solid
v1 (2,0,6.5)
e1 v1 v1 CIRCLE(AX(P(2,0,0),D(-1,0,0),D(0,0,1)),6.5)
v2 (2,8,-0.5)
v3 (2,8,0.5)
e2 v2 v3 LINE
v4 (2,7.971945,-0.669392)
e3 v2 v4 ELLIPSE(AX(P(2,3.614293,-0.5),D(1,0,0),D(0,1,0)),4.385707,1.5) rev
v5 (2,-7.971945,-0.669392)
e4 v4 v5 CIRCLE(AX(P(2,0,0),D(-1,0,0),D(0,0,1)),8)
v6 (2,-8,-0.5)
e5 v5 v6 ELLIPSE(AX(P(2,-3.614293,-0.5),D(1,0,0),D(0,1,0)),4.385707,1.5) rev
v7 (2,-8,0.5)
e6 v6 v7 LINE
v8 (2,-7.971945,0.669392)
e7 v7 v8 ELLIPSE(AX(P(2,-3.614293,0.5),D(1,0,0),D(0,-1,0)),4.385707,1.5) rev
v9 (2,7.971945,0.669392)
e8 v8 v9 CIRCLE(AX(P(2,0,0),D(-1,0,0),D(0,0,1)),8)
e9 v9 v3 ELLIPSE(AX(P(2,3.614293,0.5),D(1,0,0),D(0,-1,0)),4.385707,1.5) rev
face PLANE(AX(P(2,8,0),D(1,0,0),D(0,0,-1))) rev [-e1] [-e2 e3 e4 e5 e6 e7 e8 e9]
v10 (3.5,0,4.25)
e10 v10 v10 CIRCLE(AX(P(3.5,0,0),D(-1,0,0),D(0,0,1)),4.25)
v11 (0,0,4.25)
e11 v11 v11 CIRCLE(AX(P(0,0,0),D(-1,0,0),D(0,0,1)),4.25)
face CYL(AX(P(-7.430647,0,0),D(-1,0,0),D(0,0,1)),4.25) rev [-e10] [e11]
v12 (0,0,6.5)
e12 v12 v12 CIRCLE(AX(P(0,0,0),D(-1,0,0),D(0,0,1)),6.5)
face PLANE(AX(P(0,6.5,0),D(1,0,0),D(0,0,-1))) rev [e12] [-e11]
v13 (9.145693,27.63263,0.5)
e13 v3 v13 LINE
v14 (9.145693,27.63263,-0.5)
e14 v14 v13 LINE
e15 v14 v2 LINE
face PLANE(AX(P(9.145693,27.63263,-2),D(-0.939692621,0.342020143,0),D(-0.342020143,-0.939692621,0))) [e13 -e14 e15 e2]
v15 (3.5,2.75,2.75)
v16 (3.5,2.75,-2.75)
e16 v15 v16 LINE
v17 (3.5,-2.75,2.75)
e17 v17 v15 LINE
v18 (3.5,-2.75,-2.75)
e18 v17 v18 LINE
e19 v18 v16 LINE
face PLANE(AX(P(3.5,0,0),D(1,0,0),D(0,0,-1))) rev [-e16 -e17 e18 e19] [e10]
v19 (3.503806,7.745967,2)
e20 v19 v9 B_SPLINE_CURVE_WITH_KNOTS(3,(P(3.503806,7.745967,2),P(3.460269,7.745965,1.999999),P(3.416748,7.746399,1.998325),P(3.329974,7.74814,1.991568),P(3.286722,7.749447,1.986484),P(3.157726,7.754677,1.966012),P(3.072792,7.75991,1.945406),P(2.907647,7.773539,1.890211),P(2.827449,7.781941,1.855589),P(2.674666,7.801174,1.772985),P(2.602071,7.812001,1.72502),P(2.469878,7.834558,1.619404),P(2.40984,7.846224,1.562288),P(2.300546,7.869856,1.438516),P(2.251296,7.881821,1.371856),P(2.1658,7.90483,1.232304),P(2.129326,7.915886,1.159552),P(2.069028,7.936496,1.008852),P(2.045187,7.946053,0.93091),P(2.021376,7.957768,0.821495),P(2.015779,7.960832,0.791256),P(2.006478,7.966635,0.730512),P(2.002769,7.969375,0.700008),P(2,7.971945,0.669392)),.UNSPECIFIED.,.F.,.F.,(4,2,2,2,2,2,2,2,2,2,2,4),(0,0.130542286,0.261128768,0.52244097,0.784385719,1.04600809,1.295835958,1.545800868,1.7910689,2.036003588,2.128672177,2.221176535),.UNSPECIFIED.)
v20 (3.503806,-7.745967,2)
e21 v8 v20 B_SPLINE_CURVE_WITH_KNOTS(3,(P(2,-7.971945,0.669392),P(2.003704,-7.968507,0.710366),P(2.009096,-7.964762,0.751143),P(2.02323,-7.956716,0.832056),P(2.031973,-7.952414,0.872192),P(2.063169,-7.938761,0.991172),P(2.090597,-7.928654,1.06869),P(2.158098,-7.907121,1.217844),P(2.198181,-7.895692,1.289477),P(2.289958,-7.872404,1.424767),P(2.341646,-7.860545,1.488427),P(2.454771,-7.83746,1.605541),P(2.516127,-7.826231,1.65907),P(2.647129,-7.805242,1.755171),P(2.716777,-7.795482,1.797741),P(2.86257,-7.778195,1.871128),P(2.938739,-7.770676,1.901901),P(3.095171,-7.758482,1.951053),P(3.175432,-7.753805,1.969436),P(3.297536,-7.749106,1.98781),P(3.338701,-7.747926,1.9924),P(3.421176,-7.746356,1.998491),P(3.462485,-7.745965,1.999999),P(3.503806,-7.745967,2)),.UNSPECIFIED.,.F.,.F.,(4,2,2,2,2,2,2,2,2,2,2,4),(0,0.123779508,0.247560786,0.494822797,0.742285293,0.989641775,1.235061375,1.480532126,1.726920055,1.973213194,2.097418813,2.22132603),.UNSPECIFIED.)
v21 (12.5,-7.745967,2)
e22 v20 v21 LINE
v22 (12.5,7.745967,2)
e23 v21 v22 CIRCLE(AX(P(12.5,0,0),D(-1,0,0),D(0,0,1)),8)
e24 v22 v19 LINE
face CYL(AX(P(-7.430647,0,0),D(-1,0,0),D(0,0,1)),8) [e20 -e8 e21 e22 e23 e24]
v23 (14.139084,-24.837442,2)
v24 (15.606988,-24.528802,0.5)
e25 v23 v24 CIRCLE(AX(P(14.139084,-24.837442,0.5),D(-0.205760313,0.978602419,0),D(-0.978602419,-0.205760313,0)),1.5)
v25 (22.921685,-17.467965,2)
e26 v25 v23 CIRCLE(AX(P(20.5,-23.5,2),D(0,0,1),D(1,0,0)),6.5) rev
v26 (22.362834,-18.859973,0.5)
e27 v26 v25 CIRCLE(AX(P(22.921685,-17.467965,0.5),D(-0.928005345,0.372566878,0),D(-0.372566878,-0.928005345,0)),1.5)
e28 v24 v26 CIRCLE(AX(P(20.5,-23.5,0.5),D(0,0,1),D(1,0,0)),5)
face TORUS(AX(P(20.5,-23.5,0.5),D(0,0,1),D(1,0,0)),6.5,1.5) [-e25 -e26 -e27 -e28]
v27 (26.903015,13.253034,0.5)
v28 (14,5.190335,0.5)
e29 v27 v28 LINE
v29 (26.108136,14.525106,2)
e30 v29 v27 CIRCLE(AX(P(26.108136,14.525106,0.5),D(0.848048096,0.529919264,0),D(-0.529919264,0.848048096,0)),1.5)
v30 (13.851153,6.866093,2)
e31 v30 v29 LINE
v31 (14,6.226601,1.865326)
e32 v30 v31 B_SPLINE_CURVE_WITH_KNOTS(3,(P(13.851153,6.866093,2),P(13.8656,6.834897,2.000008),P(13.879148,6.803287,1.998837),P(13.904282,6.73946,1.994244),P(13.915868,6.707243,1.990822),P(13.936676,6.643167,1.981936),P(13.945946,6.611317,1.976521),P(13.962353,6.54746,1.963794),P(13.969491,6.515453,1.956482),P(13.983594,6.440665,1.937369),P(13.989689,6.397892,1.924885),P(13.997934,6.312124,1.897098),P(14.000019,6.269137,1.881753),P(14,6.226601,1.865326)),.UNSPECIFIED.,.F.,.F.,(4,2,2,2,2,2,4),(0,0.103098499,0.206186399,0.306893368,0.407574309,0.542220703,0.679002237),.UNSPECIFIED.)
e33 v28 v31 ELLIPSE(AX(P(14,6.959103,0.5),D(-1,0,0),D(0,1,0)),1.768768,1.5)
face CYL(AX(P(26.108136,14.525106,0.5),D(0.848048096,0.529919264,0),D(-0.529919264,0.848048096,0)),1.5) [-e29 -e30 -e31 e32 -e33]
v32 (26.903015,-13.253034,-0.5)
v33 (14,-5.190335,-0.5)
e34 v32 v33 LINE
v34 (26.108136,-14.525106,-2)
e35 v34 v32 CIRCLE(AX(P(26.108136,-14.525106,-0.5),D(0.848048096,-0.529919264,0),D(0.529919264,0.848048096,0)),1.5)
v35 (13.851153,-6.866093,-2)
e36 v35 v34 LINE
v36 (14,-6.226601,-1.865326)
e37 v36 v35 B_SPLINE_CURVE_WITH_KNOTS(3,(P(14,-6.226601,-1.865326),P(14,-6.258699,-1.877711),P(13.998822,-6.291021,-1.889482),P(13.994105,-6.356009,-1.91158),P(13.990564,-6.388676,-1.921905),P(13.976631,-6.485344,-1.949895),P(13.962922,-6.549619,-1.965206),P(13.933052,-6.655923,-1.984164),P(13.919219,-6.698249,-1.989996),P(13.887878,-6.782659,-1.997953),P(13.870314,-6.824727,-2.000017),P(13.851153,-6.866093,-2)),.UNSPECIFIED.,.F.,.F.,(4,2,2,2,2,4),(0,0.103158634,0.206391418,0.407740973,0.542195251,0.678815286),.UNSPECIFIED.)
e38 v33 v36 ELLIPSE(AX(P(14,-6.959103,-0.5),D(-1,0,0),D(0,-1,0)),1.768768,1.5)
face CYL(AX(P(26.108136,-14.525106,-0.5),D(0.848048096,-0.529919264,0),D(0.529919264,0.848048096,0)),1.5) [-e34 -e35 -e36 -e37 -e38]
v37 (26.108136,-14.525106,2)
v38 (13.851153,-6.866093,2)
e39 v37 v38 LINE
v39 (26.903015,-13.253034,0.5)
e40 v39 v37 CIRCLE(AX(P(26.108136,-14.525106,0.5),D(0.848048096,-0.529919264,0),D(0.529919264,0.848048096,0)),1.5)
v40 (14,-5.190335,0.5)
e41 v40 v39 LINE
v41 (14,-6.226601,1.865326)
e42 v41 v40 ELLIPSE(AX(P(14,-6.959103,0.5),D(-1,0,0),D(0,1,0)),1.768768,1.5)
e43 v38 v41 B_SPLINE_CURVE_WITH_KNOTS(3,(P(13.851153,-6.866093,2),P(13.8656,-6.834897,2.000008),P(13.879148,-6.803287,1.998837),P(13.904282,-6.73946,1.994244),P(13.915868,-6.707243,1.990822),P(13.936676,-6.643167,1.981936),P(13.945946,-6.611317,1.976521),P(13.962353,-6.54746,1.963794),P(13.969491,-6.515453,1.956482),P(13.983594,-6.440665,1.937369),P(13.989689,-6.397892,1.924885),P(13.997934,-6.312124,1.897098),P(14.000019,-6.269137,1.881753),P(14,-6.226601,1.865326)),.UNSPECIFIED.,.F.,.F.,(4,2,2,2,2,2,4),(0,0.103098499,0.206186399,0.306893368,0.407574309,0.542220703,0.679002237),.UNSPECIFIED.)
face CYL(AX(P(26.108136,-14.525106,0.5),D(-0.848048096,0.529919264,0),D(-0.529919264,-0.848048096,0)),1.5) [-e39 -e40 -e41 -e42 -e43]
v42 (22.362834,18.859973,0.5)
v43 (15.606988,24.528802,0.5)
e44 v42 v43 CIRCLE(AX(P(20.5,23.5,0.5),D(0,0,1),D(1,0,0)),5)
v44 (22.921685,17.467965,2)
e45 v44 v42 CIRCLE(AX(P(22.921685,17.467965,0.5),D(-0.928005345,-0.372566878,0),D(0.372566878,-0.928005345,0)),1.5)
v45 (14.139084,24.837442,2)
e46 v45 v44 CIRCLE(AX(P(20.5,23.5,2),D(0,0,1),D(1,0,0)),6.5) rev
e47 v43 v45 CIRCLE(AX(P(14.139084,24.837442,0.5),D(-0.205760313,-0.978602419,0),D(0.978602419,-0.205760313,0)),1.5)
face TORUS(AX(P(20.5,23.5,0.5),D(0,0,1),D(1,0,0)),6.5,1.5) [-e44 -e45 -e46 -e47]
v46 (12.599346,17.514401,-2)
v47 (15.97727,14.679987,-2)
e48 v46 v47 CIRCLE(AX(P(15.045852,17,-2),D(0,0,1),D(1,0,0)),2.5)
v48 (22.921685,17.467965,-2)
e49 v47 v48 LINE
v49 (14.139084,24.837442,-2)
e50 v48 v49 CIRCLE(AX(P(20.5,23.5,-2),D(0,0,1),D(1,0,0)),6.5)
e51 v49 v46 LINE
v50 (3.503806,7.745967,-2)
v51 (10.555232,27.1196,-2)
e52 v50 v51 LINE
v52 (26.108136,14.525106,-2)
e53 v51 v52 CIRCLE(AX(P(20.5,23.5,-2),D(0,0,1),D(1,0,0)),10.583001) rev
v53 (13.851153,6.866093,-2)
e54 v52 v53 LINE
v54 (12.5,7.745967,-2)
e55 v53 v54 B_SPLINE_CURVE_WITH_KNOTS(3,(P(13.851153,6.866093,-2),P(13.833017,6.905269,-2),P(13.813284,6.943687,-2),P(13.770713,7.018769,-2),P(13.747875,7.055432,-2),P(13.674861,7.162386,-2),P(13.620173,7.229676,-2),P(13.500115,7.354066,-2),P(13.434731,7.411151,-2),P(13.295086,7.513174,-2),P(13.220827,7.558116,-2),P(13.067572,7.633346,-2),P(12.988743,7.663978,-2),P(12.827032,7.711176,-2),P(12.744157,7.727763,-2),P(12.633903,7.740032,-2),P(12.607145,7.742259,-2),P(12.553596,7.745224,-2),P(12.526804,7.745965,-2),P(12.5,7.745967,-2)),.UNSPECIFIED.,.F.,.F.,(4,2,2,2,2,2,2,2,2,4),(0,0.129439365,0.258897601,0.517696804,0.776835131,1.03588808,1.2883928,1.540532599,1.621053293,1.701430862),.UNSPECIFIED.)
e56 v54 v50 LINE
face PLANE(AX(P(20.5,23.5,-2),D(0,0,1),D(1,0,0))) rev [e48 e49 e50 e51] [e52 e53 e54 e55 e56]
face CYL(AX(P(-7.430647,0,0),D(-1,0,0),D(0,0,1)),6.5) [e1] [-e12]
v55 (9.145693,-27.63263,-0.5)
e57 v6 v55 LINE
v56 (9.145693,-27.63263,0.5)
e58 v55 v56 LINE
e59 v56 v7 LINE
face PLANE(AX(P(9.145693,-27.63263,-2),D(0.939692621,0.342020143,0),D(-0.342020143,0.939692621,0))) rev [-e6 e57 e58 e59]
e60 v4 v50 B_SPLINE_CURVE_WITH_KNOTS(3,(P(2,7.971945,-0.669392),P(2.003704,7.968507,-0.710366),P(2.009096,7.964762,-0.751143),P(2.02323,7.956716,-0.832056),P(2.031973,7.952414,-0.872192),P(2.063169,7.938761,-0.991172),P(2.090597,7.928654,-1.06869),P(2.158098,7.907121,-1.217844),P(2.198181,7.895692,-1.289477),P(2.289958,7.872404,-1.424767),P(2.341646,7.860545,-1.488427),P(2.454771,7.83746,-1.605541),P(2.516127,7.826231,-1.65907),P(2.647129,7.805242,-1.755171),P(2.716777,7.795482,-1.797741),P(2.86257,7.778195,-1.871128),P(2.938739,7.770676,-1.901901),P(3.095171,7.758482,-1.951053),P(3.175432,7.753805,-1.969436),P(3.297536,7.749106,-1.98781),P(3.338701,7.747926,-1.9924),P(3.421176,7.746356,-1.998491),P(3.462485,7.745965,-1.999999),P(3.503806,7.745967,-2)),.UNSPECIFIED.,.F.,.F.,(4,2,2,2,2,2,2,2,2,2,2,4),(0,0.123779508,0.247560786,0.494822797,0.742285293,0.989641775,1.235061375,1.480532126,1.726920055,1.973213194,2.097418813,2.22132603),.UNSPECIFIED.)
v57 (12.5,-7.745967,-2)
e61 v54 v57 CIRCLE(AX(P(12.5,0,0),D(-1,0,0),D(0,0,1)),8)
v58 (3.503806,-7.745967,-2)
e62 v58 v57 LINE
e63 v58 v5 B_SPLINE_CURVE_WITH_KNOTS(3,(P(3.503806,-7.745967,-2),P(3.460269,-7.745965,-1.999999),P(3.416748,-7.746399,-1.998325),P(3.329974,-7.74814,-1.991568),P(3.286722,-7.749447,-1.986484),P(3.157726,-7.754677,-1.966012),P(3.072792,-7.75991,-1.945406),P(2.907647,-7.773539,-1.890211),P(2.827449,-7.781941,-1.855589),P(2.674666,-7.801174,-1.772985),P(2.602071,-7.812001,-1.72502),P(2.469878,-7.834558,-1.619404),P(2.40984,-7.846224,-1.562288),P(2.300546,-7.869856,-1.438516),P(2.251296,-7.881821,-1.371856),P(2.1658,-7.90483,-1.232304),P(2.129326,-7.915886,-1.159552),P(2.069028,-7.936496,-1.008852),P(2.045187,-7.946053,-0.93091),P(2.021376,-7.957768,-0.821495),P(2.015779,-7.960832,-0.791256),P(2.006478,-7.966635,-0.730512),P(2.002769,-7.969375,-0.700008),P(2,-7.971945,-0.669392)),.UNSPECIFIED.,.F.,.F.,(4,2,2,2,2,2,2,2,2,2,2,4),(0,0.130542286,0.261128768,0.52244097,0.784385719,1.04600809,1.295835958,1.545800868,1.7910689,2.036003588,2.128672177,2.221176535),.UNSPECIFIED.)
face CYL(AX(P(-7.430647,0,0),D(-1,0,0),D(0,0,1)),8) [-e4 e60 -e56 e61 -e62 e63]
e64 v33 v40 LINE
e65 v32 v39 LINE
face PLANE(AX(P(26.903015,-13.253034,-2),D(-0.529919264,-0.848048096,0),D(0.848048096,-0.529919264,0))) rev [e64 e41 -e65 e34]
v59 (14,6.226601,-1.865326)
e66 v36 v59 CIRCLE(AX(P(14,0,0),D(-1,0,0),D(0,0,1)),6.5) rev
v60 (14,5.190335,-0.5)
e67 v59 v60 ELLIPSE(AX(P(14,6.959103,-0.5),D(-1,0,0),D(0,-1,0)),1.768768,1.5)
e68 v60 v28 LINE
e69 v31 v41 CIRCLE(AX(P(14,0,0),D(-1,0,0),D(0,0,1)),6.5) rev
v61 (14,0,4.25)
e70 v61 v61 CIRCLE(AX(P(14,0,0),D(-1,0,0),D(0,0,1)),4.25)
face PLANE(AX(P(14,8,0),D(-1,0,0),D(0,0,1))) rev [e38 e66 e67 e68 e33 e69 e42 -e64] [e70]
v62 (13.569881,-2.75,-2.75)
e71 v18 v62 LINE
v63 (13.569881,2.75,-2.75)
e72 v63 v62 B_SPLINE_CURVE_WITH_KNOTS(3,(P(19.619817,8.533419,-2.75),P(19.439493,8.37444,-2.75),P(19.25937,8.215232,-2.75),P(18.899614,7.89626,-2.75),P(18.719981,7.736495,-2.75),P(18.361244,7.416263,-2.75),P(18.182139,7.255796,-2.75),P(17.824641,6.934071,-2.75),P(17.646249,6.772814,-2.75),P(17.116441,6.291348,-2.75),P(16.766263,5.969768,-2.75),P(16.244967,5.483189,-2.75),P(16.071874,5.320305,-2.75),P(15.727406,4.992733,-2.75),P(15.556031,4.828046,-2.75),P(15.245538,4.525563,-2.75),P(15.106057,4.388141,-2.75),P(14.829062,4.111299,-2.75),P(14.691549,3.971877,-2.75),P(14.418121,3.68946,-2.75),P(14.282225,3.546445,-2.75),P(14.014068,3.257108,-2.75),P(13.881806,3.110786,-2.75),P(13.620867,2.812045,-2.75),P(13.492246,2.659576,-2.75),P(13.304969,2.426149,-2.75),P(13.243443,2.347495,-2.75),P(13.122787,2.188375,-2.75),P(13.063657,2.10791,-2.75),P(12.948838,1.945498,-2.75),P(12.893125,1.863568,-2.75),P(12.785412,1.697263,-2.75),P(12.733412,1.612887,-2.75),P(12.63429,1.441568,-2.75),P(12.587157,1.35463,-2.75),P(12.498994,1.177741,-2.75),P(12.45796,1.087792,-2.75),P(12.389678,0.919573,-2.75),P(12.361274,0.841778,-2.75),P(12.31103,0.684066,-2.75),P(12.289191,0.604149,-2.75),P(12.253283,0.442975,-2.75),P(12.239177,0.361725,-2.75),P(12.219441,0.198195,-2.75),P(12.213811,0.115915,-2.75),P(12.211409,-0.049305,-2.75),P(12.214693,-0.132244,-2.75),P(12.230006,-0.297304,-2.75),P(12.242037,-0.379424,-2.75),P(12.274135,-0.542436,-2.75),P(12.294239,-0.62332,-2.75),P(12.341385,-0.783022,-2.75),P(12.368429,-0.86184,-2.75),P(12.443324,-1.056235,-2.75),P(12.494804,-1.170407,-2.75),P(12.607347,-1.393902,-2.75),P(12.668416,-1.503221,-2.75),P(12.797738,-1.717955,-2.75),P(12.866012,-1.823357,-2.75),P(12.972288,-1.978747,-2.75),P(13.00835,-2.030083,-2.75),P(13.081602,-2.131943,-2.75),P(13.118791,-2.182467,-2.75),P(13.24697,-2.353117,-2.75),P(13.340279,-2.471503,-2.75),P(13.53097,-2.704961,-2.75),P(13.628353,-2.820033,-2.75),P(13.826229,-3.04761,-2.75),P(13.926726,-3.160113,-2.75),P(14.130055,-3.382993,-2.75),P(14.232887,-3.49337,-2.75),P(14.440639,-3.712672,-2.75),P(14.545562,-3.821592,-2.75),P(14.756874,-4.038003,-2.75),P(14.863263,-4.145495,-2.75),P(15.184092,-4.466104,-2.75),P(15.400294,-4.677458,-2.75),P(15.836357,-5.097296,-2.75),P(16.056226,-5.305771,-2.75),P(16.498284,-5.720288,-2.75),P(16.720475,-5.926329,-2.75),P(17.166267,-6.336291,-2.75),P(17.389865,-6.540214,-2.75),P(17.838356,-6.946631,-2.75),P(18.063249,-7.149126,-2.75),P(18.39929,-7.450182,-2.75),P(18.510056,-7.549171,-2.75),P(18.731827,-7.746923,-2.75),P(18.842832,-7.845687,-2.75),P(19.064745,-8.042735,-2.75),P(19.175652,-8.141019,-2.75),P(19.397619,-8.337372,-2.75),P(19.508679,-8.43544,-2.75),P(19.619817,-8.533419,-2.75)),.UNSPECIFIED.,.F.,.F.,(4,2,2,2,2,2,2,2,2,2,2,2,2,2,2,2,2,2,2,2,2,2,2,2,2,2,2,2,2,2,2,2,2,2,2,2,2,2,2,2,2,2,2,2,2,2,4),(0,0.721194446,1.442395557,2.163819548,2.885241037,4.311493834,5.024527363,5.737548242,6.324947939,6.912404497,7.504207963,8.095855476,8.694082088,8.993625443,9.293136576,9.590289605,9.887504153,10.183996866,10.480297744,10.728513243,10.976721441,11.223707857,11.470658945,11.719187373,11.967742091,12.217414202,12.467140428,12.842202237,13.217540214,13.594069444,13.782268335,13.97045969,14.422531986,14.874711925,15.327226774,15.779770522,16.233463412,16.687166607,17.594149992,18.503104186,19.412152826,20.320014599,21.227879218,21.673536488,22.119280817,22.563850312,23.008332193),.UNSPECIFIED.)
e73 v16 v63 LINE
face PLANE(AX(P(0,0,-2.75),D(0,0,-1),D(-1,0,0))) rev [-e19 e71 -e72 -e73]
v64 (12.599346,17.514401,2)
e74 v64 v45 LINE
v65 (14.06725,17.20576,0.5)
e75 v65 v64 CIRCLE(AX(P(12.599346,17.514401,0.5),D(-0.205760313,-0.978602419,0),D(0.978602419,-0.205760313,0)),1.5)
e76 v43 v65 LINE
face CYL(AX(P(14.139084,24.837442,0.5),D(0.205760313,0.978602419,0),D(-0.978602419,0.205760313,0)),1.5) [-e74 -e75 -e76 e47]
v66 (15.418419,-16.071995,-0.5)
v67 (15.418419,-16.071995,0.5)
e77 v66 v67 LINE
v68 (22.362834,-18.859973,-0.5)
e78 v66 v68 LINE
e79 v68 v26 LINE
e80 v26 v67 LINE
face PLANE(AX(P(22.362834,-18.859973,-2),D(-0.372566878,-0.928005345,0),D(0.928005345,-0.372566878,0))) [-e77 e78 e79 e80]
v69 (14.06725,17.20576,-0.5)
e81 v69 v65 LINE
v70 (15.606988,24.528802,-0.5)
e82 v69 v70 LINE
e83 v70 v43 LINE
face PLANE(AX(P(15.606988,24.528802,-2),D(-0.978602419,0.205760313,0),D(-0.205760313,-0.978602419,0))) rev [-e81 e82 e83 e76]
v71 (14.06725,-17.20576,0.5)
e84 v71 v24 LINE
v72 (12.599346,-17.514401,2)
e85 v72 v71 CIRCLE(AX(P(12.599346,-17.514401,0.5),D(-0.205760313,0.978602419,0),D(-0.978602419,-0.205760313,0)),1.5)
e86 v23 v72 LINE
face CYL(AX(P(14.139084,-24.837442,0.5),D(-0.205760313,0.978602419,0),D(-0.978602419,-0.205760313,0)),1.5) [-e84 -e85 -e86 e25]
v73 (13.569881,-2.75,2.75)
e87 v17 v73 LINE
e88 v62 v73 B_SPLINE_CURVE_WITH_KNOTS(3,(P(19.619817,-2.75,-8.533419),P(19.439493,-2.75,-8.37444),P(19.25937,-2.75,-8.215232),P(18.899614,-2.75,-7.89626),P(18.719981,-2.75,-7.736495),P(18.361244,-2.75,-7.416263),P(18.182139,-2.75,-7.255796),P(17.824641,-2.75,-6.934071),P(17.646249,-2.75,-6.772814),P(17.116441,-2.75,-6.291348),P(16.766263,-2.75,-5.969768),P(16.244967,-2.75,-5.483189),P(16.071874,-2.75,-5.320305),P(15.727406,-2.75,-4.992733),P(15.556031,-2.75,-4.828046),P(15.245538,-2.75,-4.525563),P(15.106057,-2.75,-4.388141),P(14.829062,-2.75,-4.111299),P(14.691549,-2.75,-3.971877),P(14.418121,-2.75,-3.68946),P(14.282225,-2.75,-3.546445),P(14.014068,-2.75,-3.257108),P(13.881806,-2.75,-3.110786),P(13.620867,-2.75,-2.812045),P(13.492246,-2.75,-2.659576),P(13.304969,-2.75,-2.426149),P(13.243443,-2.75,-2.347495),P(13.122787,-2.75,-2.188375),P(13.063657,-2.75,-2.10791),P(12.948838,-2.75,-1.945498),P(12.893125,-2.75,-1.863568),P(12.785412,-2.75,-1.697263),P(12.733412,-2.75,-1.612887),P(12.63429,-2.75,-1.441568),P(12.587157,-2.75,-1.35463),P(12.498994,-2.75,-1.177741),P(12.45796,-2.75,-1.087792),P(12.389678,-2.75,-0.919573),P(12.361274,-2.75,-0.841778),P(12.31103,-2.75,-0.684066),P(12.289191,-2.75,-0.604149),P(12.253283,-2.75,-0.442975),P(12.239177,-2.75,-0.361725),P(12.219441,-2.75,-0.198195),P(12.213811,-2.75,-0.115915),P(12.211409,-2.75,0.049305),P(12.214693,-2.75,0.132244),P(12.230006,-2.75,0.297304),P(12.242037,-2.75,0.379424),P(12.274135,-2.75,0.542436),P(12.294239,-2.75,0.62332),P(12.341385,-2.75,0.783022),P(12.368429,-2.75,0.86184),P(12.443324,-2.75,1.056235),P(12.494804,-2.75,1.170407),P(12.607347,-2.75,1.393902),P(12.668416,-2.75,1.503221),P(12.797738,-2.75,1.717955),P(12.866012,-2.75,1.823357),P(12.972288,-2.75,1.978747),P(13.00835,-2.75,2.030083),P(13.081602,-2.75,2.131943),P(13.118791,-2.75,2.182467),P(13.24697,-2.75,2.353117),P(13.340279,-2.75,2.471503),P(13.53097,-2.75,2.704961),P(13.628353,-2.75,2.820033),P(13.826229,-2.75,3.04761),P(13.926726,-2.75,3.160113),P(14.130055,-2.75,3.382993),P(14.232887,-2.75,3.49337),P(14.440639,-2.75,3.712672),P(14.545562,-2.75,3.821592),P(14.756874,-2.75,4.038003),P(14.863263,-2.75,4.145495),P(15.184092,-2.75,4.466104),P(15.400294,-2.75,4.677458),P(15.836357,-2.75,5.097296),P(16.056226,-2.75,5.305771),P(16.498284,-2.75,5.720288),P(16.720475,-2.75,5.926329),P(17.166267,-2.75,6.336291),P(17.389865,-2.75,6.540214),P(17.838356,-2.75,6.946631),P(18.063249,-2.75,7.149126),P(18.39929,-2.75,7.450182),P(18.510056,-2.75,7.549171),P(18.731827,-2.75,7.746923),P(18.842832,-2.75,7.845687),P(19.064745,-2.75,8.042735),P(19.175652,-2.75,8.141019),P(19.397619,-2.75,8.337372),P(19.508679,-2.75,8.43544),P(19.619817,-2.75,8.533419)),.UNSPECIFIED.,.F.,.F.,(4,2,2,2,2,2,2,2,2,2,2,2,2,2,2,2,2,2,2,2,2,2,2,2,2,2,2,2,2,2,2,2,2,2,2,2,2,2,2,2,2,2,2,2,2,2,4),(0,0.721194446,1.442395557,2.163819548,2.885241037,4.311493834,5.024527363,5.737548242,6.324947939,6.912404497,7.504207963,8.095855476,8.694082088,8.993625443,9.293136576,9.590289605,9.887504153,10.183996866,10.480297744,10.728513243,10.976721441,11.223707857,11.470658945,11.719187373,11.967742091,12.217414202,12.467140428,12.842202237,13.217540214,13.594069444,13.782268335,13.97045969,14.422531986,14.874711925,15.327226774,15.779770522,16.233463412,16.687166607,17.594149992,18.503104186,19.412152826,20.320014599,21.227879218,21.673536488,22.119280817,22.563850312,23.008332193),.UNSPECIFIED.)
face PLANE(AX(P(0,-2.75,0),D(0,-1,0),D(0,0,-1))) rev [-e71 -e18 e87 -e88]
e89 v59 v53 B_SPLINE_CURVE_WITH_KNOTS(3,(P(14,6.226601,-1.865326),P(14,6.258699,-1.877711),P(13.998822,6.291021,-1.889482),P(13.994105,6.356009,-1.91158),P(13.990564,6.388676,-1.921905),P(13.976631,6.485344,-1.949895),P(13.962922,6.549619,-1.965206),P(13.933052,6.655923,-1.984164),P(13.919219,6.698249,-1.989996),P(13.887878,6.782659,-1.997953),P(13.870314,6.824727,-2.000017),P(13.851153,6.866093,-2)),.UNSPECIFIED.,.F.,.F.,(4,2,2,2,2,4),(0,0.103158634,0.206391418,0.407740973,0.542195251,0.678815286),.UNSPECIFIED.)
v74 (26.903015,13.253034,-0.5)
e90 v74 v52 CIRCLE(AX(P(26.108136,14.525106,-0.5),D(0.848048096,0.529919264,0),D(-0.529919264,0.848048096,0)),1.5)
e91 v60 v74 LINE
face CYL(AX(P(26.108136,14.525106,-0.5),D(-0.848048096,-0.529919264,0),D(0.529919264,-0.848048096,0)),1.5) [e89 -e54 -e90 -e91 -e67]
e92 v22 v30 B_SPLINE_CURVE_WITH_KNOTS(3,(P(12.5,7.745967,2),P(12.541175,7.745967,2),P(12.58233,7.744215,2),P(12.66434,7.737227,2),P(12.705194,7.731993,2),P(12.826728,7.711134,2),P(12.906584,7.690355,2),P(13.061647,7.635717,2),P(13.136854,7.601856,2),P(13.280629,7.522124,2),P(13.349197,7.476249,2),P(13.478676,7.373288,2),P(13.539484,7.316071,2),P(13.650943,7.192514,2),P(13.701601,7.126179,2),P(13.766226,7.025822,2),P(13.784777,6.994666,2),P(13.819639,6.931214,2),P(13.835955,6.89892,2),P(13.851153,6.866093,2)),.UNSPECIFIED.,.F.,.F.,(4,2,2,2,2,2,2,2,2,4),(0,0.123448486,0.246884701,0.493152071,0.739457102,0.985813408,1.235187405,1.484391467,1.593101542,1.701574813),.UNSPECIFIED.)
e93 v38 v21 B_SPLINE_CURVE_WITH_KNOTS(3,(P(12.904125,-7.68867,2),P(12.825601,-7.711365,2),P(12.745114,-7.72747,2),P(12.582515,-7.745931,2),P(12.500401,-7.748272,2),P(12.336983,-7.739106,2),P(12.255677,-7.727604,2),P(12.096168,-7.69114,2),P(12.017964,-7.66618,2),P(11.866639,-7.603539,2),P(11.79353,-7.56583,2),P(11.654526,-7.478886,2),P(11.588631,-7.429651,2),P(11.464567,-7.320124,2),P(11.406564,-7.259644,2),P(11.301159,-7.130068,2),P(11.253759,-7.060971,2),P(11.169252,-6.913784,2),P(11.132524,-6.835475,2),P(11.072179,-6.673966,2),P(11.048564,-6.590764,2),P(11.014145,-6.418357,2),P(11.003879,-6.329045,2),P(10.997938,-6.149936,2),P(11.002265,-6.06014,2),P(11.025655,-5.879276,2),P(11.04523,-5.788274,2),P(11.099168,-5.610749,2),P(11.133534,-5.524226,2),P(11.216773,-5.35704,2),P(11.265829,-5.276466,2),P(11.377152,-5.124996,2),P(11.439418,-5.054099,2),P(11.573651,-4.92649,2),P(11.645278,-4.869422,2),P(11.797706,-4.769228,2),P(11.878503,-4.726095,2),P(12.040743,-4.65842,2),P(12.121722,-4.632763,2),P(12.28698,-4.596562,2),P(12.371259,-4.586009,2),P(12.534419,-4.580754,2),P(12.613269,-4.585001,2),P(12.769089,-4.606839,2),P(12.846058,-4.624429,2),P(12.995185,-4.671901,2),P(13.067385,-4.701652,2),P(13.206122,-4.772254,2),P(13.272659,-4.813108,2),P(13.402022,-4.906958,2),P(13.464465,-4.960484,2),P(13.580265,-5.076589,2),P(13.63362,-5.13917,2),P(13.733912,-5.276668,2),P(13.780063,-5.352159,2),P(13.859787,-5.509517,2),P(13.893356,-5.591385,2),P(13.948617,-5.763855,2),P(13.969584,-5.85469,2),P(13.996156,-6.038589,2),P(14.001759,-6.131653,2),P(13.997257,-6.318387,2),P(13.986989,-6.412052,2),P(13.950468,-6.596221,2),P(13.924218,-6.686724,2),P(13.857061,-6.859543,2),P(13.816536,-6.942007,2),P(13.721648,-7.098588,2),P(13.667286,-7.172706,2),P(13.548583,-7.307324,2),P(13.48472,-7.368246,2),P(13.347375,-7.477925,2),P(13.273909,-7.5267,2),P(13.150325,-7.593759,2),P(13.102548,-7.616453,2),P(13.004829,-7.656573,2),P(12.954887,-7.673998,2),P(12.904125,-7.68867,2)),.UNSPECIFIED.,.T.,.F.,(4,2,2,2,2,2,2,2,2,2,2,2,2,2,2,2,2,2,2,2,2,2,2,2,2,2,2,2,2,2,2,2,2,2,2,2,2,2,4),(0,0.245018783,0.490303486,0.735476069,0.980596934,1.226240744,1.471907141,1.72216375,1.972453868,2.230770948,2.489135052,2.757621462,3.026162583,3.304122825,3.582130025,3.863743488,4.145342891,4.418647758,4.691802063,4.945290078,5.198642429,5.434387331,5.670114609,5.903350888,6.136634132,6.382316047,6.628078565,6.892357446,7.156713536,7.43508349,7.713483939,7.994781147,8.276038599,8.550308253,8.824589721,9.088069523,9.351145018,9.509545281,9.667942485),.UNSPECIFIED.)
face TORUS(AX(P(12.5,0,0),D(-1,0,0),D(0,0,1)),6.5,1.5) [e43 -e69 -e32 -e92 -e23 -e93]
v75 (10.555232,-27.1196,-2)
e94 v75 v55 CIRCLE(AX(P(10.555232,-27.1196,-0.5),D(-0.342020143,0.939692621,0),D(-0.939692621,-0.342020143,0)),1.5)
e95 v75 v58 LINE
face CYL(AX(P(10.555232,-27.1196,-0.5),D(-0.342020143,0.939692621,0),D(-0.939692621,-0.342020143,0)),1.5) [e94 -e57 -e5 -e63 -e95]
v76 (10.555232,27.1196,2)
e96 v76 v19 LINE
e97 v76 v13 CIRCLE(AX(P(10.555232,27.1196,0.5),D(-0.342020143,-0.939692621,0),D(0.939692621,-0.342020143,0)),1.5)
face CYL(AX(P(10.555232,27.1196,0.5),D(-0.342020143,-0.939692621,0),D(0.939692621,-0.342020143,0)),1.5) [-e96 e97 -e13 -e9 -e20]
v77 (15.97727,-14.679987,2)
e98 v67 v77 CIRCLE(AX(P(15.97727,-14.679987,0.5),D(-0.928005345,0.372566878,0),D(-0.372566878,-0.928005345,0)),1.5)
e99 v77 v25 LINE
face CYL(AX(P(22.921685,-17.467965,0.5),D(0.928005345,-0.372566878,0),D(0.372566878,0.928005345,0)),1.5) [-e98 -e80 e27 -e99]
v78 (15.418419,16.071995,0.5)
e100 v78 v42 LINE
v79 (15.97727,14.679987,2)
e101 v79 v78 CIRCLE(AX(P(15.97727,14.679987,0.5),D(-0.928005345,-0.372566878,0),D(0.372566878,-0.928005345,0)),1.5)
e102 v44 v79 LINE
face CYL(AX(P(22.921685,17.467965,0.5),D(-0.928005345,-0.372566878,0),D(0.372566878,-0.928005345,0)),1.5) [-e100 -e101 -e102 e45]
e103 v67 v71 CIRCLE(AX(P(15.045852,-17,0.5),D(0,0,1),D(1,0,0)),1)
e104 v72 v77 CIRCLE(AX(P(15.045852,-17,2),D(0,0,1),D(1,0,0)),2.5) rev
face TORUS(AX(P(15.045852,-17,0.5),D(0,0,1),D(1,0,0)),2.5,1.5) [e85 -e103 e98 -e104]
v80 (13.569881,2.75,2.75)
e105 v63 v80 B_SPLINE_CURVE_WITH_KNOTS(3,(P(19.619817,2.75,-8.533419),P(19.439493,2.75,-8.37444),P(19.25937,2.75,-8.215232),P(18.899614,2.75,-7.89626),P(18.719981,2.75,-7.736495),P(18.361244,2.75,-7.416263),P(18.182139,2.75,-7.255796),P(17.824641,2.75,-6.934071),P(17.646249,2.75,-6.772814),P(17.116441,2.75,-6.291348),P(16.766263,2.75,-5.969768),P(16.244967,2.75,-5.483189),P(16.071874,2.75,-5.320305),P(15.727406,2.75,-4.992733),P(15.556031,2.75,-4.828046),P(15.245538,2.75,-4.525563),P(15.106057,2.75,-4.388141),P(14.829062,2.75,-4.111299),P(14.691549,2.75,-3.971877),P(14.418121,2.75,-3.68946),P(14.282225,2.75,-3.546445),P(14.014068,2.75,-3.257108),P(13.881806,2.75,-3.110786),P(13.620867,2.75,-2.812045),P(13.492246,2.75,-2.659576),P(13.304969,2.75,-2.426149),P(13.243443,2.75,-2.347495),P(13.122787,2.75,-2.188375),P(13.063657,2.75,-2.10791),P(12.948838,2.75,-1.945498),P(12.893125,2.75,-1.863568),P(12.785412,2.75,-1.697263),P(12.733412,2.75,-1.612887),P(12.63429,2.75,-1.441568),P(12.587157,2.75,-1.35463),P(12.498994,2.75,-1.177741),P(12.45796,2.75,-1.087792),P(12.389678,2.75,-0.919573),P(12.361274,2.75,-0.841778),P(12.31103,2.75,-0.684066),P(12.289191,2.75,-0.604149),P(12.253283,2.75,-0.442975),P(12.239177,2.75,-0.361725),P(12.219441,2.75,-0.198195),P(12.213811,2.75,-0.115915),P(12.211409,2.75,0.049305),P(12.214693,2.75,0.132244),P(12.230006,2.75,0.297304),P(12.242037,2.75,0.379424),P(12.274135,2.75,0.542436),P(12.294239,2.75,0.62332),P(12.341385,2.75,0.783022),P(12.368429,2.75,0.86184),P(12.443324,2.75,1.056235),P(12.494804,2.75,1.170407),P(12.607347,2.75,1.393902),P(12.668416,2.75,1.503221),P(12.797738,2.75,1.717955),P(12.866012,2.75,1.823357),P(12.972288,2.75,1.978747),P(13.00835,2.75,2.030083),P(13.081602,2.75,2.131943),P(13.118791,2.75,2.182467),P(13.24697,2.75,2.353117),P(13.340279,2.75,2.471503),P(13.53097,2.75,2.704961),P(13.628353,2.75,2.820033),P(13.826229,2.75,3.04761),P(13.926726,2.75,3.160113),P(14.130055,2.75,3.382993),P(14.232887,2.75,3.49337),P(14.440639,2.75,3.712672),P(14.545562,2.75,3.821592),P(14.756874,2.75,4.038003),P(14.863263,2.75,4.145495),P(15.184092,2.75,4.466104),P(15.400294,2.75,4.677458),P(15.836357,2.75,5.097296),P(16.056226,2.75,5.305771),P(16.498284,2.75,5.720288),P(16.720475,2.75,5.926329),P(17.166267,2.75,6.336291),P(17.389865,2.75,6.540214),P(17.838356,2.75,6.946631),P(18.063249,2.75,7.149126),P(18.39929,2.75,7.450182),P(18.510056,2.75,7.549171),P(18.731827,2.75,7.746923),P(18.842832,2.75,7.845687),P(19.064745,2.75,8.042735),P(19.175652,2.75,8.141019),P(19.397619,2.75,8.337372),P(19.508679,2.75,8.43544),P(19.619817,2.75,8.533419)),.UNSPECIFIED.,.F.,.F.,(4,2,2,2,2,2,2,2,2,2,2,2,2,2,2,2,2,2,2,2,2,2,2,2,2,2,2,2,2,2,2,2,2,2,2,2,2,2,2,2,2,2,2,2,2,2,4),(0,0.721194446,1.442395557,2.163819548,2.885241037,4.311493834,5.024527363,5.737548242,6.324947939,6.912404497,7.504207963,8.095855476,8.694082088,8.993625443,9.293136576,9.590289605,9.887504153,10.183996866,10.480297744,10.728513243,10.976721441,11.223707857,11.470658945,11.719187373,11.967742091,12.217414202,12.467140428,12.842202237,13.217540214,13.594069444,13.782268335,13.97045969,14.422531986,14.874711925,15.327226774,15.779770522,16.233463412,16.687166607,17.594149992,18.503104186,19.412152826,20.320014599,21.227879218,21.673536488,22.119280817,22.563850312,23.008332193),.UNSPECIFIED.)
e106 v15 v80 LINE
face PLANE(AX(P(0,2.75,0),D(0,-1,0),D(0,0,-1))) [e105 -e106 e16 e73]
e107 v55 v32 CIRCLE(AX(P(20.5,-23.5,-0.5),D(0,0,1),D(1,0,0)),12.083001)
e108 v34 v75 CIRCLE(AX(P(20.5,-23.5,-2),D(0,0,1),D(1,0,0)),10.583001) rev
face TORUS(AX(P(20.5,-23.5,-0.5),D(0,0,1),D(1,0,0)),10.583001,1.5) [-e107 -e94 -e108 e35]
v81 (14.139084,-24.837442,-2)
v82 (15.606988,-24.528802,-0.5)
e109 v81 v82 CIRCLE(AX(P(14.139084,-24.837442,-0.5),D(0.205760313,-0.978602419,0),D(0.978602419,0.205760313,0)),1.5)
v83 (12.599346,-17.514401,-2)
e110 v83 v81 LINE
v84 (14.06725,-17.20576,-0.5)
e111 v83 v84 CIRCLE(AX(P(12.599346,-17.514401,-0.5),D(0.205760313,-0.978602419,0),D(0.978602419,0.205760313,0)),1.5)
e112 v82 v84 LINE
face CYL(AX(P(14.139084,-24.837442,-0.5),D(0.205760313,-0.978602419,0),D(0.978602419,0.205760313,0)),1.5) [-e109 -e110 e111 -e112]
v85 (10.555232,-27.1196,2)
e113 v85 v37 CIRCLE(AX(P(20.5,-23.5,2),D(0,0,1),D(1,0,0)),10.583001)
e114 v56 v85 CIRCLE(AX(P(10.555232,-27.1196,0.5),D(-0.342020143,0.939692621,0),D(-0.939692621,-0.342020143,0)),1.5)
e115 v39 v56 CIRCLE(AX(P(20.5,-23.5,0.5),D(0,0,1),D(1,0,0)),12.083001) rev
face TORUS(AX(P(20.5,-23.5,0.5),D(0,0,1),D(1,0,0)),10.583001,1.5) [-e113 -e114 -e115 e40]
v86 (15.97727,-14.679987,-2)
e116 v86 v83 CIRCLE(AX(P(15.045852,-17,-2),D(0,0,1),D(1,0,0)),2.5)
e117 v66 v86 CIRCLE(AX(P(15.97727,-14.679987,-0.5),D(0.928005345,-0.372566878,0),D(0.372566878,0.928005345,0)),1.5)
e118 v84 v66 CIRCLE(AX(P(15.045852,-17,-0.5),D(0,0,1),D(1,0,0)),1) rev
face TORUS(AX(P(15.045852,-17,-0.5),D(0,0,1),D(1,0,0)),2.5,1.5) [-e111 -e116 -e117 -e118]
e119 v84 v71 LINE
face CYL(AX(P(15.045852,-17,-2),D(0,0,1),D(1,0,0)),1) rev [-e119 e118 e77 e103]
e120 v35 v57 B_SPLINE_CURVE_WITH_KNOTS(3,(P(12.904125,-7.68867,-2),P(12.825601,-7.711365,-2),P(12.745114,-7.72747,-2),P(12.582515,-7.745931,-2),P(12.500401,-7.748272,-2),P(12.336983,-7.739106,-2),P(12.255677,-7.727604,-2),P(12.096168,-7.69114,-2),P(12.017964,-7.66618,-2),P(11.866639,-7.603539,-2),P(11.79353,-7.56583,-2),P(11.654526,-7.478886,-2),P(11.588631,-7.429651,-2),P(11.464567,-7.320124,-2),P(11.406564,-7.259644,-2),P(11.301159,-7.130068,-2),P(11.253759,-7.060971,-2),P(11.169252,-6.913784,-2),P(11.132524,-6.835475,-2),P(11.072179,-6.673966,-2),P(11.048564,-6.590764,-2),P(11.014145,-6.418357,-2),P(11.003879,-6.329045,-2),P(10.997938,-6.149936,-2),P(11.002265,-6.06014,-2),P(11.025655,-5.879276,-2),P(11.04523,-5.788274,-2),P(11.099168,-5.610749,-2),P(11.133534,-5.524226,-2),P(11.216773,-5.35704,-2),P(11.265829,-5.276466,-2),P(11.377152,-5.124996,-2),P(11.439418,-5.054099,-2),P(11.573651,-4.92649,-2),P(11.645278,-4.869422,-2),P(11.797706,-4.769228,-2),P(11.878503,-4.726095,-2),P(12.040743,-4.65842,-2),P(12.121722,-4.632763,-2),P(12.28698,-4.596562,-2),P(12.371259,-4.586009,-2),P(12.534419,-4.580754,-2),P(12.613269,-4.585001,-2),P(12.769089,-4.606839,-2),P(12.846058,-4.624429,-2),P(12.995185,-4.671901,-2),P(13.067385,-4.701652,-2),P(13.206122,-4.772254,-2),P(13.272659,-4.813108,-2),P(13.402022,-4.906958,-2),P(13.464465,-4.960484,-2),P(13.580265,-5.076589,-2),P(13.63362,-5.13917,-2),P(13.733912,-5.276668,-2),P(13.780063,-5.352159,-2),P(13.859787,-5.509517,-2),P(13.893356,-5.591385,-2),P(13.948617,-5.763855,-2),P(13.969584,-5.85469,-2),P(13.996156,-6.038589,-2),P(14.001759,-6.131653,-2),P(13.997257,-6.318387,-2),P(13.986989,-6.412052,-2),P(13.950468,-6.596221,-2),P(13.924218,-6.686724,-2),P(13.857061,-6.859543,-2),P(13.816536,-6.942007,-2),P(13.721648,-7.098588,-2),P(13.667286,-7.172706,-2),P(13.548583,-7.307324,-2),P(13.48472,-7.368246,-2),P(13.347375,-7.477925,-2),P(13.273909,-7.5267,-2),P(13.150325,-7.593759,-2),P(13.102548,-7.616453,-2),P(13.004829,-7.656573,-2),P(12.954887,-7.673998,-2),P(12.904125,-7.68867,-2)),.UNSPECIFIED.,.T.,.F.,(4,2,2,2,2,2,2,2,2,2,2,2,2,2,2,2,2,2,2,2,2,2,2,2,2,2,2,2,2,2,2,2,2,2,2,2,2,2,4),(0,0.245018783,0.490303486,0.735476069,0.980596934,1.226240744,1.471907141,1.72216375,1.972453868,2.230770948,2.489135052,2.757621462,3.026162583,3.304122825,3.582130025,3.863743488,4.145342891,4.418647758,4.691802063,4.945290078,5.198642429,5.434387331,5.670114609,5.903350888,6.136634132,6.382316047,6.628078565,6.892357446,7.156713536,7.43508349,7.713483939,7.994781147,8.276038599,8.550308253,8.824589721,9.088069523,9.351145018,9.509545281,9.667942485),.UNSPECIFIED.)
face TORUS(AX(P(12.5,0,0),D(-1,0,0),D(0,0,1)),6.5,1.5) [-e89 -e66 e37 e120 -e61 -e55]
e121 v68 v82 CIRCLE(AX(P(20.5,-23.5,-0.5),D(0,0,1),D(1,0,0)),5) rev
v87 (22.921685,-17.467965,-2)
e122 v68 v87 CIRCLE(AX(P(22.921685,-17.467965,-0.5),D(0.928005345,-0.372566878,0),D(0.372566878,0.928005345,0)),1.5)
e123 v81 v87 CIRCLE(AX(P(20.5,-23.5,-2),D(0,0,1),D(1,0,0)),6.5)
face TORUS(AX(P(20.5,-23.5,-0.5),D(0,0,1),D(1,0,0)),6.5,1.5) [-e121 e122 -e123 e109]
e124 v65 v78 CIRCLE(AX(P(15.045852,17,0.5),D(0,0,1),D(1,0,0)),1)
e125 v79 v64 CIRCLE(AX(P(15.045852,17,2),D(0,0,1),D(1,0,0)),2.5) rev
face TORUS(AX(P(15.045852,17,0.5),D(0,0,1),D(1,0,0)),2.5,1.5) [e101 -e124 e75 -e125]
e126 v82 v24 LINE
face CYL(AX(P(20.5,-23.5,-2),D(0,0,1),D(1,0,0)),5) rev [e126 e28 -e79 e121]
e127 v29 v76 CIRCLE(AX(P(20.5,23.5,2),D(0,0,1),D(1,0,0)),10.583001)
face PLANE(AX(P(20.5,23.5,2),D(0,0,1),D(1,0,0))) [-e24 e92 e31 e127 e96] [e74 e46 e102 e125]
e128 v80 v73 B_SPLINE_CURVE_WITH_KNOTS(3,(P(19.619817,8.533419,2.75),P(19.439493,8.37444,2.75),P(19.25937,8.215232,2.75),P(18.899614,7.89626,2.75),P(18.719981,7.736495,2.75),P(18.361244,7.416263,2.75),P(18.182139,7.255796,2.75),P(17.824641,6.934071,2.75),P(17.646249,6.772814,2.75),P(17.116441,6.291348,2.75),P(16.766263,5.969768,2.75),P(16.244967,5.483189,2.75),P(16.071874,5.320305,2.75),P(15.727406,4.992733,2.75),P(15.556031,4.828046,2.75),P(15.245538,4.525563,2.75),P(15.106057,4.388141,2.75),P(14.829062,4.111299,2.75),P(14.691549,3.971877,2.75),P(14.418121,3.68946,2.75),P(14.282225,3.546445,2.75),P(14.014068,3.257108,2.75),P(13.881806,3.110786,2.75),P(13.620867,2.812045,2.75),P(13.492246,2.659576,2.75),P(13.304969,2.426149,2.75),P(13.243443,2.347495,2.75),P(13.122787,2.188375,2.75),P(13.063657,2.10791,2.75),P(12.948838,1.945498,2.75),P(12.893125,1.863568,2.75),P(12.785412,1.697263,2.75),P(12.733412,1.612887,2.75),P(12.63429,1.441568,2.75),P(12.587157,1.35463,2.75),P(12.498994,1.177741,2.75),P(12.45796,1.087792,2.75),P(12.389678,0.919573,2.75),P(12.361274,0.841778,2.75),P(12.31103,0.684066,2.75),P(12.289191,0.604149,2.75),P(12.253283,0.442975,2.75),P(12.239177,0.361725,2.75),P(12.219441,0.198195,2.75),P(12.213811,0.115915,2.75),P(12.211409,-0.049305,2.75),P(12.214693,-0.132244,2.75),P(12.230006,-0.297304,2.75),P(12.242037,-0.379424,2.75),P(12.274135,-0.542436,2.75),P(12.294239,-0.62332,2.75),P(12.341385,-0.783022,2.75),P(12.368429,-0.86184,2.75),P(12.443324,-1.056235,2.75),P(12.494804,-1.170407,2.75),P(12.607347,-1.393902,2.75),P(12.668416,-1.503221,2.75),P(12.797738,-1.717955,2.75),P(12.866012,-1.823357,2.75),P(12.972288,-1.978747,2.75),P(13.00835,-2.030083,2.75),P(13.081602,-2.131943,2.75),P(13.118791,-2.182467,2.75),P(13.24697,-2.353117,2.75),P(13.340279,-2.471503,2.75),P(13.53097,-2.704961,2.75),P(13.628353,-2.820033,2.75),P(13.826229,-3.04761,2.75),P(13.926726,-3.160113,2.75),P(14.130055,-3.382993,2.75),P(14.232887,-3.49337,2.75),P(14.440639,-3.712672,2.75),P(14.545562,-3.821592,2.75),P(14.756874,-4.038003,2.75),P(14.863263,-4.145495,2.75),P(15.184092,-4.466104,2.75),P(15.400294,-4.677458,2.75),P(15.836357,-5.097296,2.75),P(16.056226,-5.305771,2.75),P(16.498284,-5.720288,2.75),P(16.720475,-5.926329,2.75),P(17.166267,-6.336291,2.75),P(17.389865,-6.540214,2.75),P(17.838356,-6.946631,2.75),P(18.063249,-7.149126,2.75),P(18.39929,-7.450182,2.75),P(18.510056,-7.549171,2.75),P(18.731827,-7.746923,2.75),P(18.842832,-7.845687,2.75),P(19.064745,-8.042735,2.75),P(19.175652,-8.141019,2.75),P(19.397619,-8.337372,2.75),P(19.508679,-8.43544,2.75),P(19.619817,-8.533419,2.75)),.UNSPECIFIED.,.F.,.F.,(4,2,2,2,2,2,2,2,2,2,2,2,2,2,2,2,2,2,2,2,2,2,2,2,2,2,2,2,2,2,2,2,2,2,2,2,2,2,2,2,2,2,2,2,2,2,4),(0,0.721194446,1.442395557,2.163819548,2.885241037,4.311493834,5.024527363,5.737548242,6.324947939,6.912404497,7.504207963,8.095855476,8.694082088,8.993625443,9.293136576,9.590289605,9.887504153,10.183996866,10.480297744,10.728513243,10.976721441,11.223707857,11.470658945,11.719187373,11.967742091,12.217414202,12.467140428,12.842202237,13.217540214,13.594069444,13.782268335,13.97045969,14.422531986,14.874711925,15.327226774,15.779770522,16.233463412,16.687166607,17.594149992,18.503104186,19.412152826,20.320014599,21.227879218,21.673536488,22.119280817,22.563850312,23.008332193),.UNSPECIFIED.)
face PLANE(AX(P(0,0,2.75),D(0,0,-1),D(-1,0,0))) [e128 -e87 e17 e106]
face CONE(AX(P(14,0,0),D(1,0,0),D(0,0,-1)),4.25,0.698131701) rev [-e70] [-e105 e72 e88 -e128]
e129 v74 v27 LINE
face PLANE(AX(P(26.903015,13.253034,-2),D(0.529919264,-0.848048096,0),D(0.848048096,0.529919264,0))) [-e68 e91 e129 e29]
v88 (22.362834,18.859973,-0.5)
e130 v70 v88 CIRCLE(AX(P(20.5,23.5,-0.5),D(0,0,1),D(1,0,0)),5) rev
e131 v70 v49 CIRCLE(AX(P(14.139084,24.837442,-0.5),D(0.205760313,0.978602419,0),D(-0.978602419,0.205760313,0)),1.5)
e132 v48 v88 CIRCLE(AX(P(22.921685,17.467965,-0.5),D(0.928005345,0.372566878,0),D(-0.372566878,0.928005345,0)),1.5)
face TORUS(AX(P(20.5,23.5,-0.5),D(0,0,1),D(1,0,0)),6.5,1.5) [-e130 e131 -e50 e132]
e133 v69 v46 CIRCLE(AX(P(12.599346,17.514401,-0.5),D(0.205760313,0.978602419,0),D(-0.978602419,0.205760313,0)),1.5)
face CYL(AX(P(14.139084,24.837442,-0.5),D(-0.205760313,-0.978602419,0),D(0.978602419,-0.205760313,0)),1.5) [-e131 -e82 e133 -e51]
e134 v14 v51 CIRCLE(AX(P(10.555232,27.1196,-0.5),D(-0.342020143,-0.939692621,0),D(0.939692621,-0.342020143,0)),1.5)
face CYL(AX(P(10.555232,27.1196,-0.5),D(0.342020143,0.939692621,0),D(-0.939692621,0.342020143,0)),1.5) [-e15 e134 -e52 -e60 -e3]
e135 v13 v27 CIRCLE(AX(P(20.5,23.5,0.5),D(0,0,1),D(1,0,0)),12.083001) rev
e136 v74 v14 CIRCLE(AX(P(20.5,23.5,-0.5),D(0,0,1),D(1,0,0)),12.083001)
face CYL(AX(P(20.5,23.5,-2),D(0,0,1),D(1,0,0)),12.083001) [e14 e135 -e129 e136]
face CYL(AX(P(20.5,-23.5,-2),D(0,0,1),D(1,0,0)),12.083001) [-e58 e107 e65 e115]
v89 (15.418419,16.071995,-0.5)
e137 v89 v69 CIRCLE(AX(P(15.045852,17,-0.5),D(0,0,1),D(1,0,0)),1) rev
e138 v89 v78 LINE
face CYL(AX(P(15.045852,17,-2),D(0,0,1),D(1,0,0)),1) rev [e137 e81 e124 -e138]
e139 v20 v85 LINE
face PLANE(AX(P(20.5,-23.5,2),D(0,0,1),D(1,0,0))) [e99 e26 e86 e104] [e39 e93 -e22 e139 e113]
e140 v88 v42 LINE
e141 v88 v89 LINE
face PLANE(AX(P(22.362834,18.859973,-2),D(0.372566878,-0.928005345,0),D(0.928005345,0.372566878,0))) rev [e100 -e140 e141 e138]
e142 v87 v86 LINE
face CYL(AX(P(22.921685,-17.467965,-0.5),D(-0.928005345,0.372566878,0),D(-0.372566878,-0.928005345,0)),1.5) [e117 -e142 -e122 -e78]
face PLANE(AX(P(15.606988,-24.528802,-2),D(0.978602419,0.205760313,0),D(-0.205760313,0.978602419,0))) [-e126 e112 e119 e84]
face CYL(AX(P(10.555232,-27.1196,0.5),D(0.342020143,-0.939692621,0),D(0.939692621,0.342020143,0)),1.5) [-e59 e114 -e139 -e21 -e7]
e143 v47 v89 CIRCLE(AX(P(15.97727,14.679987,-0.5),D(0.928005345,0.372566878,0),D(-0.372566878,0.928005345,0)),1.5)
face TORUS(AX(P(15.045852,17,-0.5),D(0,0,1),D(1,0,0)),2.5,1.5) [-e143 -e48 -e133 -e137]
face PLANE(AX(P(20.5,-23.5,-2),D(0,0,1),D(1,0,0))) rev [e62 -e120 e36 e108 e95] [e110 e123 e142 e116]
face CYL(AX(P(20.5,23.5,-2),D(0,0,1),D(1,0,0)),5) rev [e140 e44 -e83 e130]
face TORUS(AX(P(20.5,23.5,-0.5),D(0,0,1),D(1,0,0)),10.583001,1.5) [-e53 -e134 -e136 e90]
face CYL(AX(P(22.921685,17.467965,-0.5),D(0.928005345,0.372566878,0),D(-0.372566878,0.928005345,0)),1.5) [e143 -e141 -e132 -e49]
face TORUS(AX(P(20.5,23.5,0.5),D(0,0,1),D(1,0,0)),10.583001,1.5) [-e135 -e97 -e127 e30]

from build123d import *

# Parameters (mm, degrees)
BOSS_EXTRUDE7_DEPTH = 2
FILLET1_R           = 1.5
FILLET2_R           = 1.5
SKETCH8_W           = 5.5
SKETCH8_H           = 5.5
CUT_EXTRUDE2_DEPTH  = 41.932602208251375


with BuildPart() as part:
    # Sketch1 → Revolve1 (revolve)
    with BuildSketch(Plane.XY, mode=Mode.PRIVATE) as revolve1_sk:
        Polygon((0, 6.5), (2, 6.5), (2, 8), (14, 8), (14.000000000000002, 0), (3.500000000000001, 0), (3.500000000000001, 4.25), (0, 4.25), align=None)
    revolve(revolve1_sk.sketch.rotate(Axis((-7.430646831025688, 0, 0), (1, 0, 0)), 90), axis=Axis((-7.430646831025688, 0, 0), (1, 0, 0)))

    # Sketch2 → Boss-Extrude7 (add, symmetric)
    with BuildSketch(Plane.XY):
        with BuildLine():
            Line((9.145692876220155, 27.632629823772568), (1.9999999999999991, 8))
            Line((1.9999999999999991, 8), (1.9999999999999991, 5.190335075472997))
            Line((1.9999999999999991, 5.190335075472997), (13.999999999999998, 5.190335075472996))
            Line((13.999999999999998, 5.190335075472996), (26.903015139013274, 13.25303378306442))
            ThreePointArc((26.903015139013274, 13.25303378306442), (28.10407907988145, 32.890255633813254), (9.145692876220155, 27.632629823772568))
        make_face()
        with BuildLine():
            Line((15.606987907325461, 24.528801565386047), (14.067249978812832, 17.20576031307721))
            ThreePointArc((14.067249978812832, 17.20576031307721), (14.403064787661203, 16.23395555688102), (15.41841927556744, 16.071994654512363))
            Line((15.41841927556744, 16.071994654512363), (22.36283439109851, 18.859973272561824))
            ThreePointArc((22.36283439109851, 18.859973272561824), (23.71393804843267, 27.330222215594908), (15.606987907325461, 24.528801565386047))
        make_face(mode=Mode.SUBTRACT)
    extrude(amount=BOSS_EXTRUDE7_DEPTH, both=True)

    # Fillet1
    # the kernel refuses this fillet: 1.5 mm, written as the material it takes off along each edge
    with BuildSketch(Plane(origin=(15.045852397347742, 17.000000000000004, 2), x_dir=(-0.9786024185349075, 0.20576031307720596, 0), z_dir=(0.20576031307720596, 0.9786024185349075, 0))) as fillet1_piece_1:
        with BuildLine():
            CenterArc((1.0000000000000029 + FILLET1_R, -FILLET1_R), FILLET1_R, 90, 90)
            Line((1.0000000000000029 + FILLET1_R, 0), (1.0000000000000029, 0))
            Line((1.0000000000000029, 0), (1.0000000000000029, -FILLET1_R))
        make_face()
    revolve(axis=Axis((15.045852397347742, 17.000000000000004, 2), (0, 0, 1)), revolution_arc=123.74802133376333, mode=Mode.SUBTRACT)
    with BuildSketch(Plane(origin=(15.41841927556744, 16.071994654512363, 2), x_dir=(-4.9e-16, 1.22e-15, -1), z_dir=(0.9280053454876351, 0.37256687821970313, 0))) as fillet1_piece_2:
        with BuildLine():
            CenterArc((FILLET1_R, -FILLET1_R), FILLET1_R, 89.99999999999993, 89.99999999999993)
            Line((-1.97e-15, -FILLET1_R), (0, 0))
            Line((0, 0), (FILLET1_R, 0))
        make_face()
    extrude(amount=7.483162838767937, mode=Mode.SUBTRACT)
    with BuildSketch(Plane(origin=(15.606987907325461, 24.528801565386047, 2), x_dir=(0, 0, -1), z_dir=(-0.20576031307720943, -0.9786024185349067, 0))) as fillet1_piece_3:
        with BuildLine():
            CenterArc((FILLET1_R, -FILLET1_R), FILLET1_R, 90, 90)
            Line((0, -FILLET1_R), (0, 0))
            Line((0, 0), (FILLET1_R, 0))
        make_face()
    extrude(amount=7.4831628387679325, mode=Mode.SUBTRACT)
    with BuildSketch(Plane(origin=(20.499999999999993, 23.5, 2), x_dir=(0.37256687821970325, -0.928005345487635, 0), z_dir=(-0.928005345487635, -0.37256687821970325, 0))) as fillet1_piece_4:
        with BuildLine():
            CenterArc((5.000000000000001 + FILLET1_R, -FILLET1_R), FILLET1_R, 90.00000000000007, 89.99999999999994)
            Line((5.000000000000001 + FILLET1_R, 0), (5.000000000000001, 0))
            Line((5.000000000000001, 0), (5.000000000000003, -FILLET1_R))
        make_face()
    revolve(axis=Axis((20.499999999999993, 23.5, 2), (0, 0, 1)), revolution_arc=236.25197866623597, mode=Mode.SUBTRACT)
    with BuildSketch(Plane(origin=(20.499999999999993, 23.5, -2), x_dir=(0.37256687821970325, -0.928005345487635, 0), z_dir=(-0.928005345487635, -0.37256687821970325, 0))) as fillet1_piece_5:
        with BuildLine():
            CenterArc((5.000000000000001 + FILLET1_R, FILLET1_R), FILLET1_R, 180, 90)
            Line((4.999999999999995, FILLET1_R), (5.000000000000001, 0))
            Line((5.000000000000001, 0), (5.000000000000001 + FILLET1_R, 0))
        make_face()
    revolve(axis=Axis((20.499999999999993, 23.5, -2), (0, 0, 1)), revolution_arc=236.25197866623597, mode=Mode.SUBTRACT)
    with BuildSketch(Plane(origin=(15.045852397347742, 17.000000000000004, -2), x_dir=(-0.9786024185349075, 0.20576031307720596, 0), z_dir=(0.20576031307720596, 0.9786024185349075, 0))) as fillet1_piece_6:
        with BuildLine():
            CenterArc((1.0000000000000029 + FILLET1_R, FILLET1_R), FILLET1_R, 180, 90)
            Line((1.0000000000000029, FILLET1_R), (1.0000000000000029, 0))
            Line((1.0000000000000029, 0), (1.0000000000000029 + FILLET1_R, 0))
        make_face()
    revolve(axis=Axis((15.045852397347742, 17.000000000000004, -2), (0, 0, 1)), revolution_arc=123.74802133376333, mode=Mode.SUBTRACT)
    with BuildSketch(Plane(origin=(15.41841927556744, 16.071994654512363, -2), x_dir=(0.3725668782197031, -0.928005345487635, 0), z_dir=(0.9280053454876351, 0.37256687821970313, 0))) as fillet1_piece_7:
        with BuildLine():
            CenterArc((FILLET1_R, -FILLET1_R), FILLET1_R, 90, 90)
            Line((-1.97e-15, -FILLET1_R), (0, 0))
            Line((0, 0), (FILLET1_R, 0))
        make_face()
    extrude(amount=7.483162838767937, mode=Mode.SUBTRACT)
    with BuildSketch(Plane(origin=(15.606987907325461, 24.528801565386047, -2), x_dir=(-0.9786024185349067, 0.2057603130772094, 0), z_dir=(-0.20576031307720943, -0.9786024185349067, 0))) as fillet1_piece_8:
        with BuildLine():
            CenterArc((FILLET1_R, -FILLET1_R), FILLET1_R, 90, 90)
            Line((0, -FILLET1_R), (0, 0))
            Line((0, 0), (FILLET1_R, 0))
        make_face()
    extrude(amount=7.4831628387679325, mode=Mode.SUBTRACT)
    with BuildSketch(Plane(origin=(9.145692876220155, 27.632629823772568, -2), x_dir=(0.9396926207859081, -0.3420201433256697, 0), z_dir=(-0.3420201433256697, -0.9396926207859081, 0))) as fillet1_piece_9_section:
        with BuildLine():
            CenterArc((FILLET1_R, FILLET1_R), FILLET1_R, 180, 90)
            Line((-1.67e-15, FILLET1_R), (0, 0))
            Line((0, 0), (FILLET1_R, 0))
        make_face()
    fillet1_piece_9 = extrude(amount=27.26760827370646, mode=Mode.PRIVATE)
    fillet1_piece_9 = fillet1_piece_9 - Plane(origin=(9.145692876220155, 0, 0), x_dir=(0, 1.1e-16, 1), z_dir=(1, 0, 0)) * Cylinder(8, 61, mode=Mode.PRIVATE)
    add(fillet1_piece_9, mode=Mode.SUBTRACT)
    with BuildSketch(Plane(origin=(10.819819639413396, 3.2031378345984844, -2), x_dir=(4e-16, -6.4e-16, 1), z_dir=(0.8480480961564273, 0.529919264233203, 0))) as fillet1_piece_10_section:
        with BuildLine():
            CenterArc((FILLET1_R, -FILLET1_R), FILLET1_R, 89.99999999999996, 90.00000000000004)
            Line((-1.13e-15, -FILLET1_R), (0, 0))
            Line((0, 0), (FILLET1_R, 0))
        make_face()
    fillet1_piece_10 = extrude(amount=18.964956790178615, mode=Mode.PRIVATE)
    fillet1_piece_10 = split(fillet1_piece_10, bisect_by=Plane(origin=(14, 3.2031378345984844, -2), z_dir=(1, 0, 0)), keep=Keep.TOP, mode=Mode.PRIVATE)
    add(fillet1_piece_10, mode=Mode.SUBTRACT)
    with BuildSketch(Plane(origin=(20.5, 23.500000000000004, -2), x_dir=(0.5299192642332029, -0.8480480961564273, 0), z_dir=(-0.8480480961564273, -0.5299192642332029, 0))) as fillet1_piece_11:
        with BuildLine():
            CenterArc((12.083001262991425 - FILLET1_R, FILLET1_R), FILLET1_R, 270.0000000000002, 89.99999999999977)
            Line((12.083001262991425 - FILLET1_R, 0), (12.083001262991425, 0))
            Line((12.083001262991425, 0), (12.083001262991418, FILLET1_R))
        make_face()
    revolve(axis=Axis((20.5, 23.500000000000004, -2), (0, 0, 1)), revolution_arc=218.00000000000014, mode=Mode.SUBTRACT)
    with BuildSketch(Plane(origin=(9.145692876220155, 27.632629823772568, 2), x_dir=(0, 0, -1), z_dir=(-0.3420201433256697, -0.9396926207859081, 0))) as fillet1_piece_12_section:
        with BuildLine():
            CenterArc((FILLET1_R, FILLET1_R), FILLET1_R, 180.00000000000006, 89.99999999999994)
            Line((0, FILLET1_R), (0, 0))
            Line((0, 0), (FILLET1_R, 0))
        make_face()
    fillet1_piece_12 = extrude(amount=27.26760827370646, mode=Mode.PRIVATE)
    fillet1_piece_12 = fillet1_piece_12 - Plane(origin=(9.145692876220155, 0, 0), x_dir=(0, 1.1e-16, 1), z_dir=(1, 0, 0)) * Cylinder(8, 61, mode=Mode.PRIVATE)
    add(fillet1_piece_12, mode=Mode.SUBTRACT)
    with BuildSketch(Plane(origin=(10.819819639413396, 3.2031378345984844, 2), x_dir=(4e-16, -6.4e-16, -1), z_dir=(0.8480480961564273, 0.529919264233203, 0))) as fillet1_piece_13_section:
        with BuildLine():
            CenterArc((FILLET1_R, FILLET1_R), FILLET1_R, 180, 90.00000000000006)
            Line((-1.13e-15, FILLET1_R), (0, 0))
            Line((0, 0), (FILLET1_R, 0))
        make_face()
    fillet1_piece_13 = extrude(amount=18.964956790178615, mode=Mode.PRIVATE)
    fillet1_piece_13 = split(fillet1_piece_13, bisect_by=Plane(origin=(14, 3.2031378345984844, 2), z_dir=(1, 0, 0)), keep=Keep.TOP, mode=Mode.PRIVATE)
    add(fillet1_piece_13, mode=Mode.SUBTRACT)
    with BuildSketch(Plane(origin=(20.5, 23.500000000000004, 2), x_dir=(0.5299192642332029, -0.8480480961564273, 0), z_dir=(-0.8480480961564273, -0.5299192642332029, 0))) as fillet1_piece_14:
        with BuildLine():
            CenterArc((12.083001262991425 - FILLET1_R, -FILLET1_R), FILLET1_R, 0, 89.9999999999998)
            Line((12.083001262991425 - FILLET1_R, 0), (12.083001262991425, 0))
            Line((12.083001262991425, 0), (12.083001262991418, -FILLET1_R))
        make_face()
    revolve(axis=Axis((20.5, 23.500000000000004, 2), (0, 0, 1)), revolution_arc=218.00000000000014, mode=Mode.SUBTRACT)

    # Fillet2
    fillet2_edges = [part.edges().sort_by_distance(p)[0] for p in [
        (14, -8, 1.11e-15),
    ]]
    fillet(fillet2_edges, radius=FILLET2_R)

    # Mirror1: read off the stored shape, not the designer's step
    # Mirror1: part across plane


with BuildPart() as part_1:
    add(part.part)
    add(part.part.mirror(Plane.ZX))

    # Sketch8 → Cut-Extrude2 (cut, through all)
    with BuildSketch(Plane(origin=(14.000000000000002, 0, 0), x_dir=(0, 0, -1), z_dir=(1, 0, 0))):
        Rectangle(SKETCH8_W, SKETCH8_H)
    extrude(amount=-CUT_EXTRUDE2_DEPTH, mode=Mode.SUBTRACT)

    # Sketch11 → Cut-Revolve2 (revolve, cut)
    with BuildSketch(Plane(origin=(0, 0, 0), x_dir=(1, 0, 0), z_dir=(0, 1, 0)), mode=Mode.PRIVATE) as cut_revolve2_sk:
        Polygon((14.000000000000002, 2.7499999999999996), (12.212369611108668, 2.7499999999999996), (14.000000000000002, 4.25), align=None)
    revolve(cut_revolve2_sk.sketch.rotate(Axis((0, 0, 0), (1, 0, 0)), 315.000105402), axis=Axis((0, 0, 0), (1, 0, 0)), mode=Mode.SUBTRACT)


solid = part_1.part
